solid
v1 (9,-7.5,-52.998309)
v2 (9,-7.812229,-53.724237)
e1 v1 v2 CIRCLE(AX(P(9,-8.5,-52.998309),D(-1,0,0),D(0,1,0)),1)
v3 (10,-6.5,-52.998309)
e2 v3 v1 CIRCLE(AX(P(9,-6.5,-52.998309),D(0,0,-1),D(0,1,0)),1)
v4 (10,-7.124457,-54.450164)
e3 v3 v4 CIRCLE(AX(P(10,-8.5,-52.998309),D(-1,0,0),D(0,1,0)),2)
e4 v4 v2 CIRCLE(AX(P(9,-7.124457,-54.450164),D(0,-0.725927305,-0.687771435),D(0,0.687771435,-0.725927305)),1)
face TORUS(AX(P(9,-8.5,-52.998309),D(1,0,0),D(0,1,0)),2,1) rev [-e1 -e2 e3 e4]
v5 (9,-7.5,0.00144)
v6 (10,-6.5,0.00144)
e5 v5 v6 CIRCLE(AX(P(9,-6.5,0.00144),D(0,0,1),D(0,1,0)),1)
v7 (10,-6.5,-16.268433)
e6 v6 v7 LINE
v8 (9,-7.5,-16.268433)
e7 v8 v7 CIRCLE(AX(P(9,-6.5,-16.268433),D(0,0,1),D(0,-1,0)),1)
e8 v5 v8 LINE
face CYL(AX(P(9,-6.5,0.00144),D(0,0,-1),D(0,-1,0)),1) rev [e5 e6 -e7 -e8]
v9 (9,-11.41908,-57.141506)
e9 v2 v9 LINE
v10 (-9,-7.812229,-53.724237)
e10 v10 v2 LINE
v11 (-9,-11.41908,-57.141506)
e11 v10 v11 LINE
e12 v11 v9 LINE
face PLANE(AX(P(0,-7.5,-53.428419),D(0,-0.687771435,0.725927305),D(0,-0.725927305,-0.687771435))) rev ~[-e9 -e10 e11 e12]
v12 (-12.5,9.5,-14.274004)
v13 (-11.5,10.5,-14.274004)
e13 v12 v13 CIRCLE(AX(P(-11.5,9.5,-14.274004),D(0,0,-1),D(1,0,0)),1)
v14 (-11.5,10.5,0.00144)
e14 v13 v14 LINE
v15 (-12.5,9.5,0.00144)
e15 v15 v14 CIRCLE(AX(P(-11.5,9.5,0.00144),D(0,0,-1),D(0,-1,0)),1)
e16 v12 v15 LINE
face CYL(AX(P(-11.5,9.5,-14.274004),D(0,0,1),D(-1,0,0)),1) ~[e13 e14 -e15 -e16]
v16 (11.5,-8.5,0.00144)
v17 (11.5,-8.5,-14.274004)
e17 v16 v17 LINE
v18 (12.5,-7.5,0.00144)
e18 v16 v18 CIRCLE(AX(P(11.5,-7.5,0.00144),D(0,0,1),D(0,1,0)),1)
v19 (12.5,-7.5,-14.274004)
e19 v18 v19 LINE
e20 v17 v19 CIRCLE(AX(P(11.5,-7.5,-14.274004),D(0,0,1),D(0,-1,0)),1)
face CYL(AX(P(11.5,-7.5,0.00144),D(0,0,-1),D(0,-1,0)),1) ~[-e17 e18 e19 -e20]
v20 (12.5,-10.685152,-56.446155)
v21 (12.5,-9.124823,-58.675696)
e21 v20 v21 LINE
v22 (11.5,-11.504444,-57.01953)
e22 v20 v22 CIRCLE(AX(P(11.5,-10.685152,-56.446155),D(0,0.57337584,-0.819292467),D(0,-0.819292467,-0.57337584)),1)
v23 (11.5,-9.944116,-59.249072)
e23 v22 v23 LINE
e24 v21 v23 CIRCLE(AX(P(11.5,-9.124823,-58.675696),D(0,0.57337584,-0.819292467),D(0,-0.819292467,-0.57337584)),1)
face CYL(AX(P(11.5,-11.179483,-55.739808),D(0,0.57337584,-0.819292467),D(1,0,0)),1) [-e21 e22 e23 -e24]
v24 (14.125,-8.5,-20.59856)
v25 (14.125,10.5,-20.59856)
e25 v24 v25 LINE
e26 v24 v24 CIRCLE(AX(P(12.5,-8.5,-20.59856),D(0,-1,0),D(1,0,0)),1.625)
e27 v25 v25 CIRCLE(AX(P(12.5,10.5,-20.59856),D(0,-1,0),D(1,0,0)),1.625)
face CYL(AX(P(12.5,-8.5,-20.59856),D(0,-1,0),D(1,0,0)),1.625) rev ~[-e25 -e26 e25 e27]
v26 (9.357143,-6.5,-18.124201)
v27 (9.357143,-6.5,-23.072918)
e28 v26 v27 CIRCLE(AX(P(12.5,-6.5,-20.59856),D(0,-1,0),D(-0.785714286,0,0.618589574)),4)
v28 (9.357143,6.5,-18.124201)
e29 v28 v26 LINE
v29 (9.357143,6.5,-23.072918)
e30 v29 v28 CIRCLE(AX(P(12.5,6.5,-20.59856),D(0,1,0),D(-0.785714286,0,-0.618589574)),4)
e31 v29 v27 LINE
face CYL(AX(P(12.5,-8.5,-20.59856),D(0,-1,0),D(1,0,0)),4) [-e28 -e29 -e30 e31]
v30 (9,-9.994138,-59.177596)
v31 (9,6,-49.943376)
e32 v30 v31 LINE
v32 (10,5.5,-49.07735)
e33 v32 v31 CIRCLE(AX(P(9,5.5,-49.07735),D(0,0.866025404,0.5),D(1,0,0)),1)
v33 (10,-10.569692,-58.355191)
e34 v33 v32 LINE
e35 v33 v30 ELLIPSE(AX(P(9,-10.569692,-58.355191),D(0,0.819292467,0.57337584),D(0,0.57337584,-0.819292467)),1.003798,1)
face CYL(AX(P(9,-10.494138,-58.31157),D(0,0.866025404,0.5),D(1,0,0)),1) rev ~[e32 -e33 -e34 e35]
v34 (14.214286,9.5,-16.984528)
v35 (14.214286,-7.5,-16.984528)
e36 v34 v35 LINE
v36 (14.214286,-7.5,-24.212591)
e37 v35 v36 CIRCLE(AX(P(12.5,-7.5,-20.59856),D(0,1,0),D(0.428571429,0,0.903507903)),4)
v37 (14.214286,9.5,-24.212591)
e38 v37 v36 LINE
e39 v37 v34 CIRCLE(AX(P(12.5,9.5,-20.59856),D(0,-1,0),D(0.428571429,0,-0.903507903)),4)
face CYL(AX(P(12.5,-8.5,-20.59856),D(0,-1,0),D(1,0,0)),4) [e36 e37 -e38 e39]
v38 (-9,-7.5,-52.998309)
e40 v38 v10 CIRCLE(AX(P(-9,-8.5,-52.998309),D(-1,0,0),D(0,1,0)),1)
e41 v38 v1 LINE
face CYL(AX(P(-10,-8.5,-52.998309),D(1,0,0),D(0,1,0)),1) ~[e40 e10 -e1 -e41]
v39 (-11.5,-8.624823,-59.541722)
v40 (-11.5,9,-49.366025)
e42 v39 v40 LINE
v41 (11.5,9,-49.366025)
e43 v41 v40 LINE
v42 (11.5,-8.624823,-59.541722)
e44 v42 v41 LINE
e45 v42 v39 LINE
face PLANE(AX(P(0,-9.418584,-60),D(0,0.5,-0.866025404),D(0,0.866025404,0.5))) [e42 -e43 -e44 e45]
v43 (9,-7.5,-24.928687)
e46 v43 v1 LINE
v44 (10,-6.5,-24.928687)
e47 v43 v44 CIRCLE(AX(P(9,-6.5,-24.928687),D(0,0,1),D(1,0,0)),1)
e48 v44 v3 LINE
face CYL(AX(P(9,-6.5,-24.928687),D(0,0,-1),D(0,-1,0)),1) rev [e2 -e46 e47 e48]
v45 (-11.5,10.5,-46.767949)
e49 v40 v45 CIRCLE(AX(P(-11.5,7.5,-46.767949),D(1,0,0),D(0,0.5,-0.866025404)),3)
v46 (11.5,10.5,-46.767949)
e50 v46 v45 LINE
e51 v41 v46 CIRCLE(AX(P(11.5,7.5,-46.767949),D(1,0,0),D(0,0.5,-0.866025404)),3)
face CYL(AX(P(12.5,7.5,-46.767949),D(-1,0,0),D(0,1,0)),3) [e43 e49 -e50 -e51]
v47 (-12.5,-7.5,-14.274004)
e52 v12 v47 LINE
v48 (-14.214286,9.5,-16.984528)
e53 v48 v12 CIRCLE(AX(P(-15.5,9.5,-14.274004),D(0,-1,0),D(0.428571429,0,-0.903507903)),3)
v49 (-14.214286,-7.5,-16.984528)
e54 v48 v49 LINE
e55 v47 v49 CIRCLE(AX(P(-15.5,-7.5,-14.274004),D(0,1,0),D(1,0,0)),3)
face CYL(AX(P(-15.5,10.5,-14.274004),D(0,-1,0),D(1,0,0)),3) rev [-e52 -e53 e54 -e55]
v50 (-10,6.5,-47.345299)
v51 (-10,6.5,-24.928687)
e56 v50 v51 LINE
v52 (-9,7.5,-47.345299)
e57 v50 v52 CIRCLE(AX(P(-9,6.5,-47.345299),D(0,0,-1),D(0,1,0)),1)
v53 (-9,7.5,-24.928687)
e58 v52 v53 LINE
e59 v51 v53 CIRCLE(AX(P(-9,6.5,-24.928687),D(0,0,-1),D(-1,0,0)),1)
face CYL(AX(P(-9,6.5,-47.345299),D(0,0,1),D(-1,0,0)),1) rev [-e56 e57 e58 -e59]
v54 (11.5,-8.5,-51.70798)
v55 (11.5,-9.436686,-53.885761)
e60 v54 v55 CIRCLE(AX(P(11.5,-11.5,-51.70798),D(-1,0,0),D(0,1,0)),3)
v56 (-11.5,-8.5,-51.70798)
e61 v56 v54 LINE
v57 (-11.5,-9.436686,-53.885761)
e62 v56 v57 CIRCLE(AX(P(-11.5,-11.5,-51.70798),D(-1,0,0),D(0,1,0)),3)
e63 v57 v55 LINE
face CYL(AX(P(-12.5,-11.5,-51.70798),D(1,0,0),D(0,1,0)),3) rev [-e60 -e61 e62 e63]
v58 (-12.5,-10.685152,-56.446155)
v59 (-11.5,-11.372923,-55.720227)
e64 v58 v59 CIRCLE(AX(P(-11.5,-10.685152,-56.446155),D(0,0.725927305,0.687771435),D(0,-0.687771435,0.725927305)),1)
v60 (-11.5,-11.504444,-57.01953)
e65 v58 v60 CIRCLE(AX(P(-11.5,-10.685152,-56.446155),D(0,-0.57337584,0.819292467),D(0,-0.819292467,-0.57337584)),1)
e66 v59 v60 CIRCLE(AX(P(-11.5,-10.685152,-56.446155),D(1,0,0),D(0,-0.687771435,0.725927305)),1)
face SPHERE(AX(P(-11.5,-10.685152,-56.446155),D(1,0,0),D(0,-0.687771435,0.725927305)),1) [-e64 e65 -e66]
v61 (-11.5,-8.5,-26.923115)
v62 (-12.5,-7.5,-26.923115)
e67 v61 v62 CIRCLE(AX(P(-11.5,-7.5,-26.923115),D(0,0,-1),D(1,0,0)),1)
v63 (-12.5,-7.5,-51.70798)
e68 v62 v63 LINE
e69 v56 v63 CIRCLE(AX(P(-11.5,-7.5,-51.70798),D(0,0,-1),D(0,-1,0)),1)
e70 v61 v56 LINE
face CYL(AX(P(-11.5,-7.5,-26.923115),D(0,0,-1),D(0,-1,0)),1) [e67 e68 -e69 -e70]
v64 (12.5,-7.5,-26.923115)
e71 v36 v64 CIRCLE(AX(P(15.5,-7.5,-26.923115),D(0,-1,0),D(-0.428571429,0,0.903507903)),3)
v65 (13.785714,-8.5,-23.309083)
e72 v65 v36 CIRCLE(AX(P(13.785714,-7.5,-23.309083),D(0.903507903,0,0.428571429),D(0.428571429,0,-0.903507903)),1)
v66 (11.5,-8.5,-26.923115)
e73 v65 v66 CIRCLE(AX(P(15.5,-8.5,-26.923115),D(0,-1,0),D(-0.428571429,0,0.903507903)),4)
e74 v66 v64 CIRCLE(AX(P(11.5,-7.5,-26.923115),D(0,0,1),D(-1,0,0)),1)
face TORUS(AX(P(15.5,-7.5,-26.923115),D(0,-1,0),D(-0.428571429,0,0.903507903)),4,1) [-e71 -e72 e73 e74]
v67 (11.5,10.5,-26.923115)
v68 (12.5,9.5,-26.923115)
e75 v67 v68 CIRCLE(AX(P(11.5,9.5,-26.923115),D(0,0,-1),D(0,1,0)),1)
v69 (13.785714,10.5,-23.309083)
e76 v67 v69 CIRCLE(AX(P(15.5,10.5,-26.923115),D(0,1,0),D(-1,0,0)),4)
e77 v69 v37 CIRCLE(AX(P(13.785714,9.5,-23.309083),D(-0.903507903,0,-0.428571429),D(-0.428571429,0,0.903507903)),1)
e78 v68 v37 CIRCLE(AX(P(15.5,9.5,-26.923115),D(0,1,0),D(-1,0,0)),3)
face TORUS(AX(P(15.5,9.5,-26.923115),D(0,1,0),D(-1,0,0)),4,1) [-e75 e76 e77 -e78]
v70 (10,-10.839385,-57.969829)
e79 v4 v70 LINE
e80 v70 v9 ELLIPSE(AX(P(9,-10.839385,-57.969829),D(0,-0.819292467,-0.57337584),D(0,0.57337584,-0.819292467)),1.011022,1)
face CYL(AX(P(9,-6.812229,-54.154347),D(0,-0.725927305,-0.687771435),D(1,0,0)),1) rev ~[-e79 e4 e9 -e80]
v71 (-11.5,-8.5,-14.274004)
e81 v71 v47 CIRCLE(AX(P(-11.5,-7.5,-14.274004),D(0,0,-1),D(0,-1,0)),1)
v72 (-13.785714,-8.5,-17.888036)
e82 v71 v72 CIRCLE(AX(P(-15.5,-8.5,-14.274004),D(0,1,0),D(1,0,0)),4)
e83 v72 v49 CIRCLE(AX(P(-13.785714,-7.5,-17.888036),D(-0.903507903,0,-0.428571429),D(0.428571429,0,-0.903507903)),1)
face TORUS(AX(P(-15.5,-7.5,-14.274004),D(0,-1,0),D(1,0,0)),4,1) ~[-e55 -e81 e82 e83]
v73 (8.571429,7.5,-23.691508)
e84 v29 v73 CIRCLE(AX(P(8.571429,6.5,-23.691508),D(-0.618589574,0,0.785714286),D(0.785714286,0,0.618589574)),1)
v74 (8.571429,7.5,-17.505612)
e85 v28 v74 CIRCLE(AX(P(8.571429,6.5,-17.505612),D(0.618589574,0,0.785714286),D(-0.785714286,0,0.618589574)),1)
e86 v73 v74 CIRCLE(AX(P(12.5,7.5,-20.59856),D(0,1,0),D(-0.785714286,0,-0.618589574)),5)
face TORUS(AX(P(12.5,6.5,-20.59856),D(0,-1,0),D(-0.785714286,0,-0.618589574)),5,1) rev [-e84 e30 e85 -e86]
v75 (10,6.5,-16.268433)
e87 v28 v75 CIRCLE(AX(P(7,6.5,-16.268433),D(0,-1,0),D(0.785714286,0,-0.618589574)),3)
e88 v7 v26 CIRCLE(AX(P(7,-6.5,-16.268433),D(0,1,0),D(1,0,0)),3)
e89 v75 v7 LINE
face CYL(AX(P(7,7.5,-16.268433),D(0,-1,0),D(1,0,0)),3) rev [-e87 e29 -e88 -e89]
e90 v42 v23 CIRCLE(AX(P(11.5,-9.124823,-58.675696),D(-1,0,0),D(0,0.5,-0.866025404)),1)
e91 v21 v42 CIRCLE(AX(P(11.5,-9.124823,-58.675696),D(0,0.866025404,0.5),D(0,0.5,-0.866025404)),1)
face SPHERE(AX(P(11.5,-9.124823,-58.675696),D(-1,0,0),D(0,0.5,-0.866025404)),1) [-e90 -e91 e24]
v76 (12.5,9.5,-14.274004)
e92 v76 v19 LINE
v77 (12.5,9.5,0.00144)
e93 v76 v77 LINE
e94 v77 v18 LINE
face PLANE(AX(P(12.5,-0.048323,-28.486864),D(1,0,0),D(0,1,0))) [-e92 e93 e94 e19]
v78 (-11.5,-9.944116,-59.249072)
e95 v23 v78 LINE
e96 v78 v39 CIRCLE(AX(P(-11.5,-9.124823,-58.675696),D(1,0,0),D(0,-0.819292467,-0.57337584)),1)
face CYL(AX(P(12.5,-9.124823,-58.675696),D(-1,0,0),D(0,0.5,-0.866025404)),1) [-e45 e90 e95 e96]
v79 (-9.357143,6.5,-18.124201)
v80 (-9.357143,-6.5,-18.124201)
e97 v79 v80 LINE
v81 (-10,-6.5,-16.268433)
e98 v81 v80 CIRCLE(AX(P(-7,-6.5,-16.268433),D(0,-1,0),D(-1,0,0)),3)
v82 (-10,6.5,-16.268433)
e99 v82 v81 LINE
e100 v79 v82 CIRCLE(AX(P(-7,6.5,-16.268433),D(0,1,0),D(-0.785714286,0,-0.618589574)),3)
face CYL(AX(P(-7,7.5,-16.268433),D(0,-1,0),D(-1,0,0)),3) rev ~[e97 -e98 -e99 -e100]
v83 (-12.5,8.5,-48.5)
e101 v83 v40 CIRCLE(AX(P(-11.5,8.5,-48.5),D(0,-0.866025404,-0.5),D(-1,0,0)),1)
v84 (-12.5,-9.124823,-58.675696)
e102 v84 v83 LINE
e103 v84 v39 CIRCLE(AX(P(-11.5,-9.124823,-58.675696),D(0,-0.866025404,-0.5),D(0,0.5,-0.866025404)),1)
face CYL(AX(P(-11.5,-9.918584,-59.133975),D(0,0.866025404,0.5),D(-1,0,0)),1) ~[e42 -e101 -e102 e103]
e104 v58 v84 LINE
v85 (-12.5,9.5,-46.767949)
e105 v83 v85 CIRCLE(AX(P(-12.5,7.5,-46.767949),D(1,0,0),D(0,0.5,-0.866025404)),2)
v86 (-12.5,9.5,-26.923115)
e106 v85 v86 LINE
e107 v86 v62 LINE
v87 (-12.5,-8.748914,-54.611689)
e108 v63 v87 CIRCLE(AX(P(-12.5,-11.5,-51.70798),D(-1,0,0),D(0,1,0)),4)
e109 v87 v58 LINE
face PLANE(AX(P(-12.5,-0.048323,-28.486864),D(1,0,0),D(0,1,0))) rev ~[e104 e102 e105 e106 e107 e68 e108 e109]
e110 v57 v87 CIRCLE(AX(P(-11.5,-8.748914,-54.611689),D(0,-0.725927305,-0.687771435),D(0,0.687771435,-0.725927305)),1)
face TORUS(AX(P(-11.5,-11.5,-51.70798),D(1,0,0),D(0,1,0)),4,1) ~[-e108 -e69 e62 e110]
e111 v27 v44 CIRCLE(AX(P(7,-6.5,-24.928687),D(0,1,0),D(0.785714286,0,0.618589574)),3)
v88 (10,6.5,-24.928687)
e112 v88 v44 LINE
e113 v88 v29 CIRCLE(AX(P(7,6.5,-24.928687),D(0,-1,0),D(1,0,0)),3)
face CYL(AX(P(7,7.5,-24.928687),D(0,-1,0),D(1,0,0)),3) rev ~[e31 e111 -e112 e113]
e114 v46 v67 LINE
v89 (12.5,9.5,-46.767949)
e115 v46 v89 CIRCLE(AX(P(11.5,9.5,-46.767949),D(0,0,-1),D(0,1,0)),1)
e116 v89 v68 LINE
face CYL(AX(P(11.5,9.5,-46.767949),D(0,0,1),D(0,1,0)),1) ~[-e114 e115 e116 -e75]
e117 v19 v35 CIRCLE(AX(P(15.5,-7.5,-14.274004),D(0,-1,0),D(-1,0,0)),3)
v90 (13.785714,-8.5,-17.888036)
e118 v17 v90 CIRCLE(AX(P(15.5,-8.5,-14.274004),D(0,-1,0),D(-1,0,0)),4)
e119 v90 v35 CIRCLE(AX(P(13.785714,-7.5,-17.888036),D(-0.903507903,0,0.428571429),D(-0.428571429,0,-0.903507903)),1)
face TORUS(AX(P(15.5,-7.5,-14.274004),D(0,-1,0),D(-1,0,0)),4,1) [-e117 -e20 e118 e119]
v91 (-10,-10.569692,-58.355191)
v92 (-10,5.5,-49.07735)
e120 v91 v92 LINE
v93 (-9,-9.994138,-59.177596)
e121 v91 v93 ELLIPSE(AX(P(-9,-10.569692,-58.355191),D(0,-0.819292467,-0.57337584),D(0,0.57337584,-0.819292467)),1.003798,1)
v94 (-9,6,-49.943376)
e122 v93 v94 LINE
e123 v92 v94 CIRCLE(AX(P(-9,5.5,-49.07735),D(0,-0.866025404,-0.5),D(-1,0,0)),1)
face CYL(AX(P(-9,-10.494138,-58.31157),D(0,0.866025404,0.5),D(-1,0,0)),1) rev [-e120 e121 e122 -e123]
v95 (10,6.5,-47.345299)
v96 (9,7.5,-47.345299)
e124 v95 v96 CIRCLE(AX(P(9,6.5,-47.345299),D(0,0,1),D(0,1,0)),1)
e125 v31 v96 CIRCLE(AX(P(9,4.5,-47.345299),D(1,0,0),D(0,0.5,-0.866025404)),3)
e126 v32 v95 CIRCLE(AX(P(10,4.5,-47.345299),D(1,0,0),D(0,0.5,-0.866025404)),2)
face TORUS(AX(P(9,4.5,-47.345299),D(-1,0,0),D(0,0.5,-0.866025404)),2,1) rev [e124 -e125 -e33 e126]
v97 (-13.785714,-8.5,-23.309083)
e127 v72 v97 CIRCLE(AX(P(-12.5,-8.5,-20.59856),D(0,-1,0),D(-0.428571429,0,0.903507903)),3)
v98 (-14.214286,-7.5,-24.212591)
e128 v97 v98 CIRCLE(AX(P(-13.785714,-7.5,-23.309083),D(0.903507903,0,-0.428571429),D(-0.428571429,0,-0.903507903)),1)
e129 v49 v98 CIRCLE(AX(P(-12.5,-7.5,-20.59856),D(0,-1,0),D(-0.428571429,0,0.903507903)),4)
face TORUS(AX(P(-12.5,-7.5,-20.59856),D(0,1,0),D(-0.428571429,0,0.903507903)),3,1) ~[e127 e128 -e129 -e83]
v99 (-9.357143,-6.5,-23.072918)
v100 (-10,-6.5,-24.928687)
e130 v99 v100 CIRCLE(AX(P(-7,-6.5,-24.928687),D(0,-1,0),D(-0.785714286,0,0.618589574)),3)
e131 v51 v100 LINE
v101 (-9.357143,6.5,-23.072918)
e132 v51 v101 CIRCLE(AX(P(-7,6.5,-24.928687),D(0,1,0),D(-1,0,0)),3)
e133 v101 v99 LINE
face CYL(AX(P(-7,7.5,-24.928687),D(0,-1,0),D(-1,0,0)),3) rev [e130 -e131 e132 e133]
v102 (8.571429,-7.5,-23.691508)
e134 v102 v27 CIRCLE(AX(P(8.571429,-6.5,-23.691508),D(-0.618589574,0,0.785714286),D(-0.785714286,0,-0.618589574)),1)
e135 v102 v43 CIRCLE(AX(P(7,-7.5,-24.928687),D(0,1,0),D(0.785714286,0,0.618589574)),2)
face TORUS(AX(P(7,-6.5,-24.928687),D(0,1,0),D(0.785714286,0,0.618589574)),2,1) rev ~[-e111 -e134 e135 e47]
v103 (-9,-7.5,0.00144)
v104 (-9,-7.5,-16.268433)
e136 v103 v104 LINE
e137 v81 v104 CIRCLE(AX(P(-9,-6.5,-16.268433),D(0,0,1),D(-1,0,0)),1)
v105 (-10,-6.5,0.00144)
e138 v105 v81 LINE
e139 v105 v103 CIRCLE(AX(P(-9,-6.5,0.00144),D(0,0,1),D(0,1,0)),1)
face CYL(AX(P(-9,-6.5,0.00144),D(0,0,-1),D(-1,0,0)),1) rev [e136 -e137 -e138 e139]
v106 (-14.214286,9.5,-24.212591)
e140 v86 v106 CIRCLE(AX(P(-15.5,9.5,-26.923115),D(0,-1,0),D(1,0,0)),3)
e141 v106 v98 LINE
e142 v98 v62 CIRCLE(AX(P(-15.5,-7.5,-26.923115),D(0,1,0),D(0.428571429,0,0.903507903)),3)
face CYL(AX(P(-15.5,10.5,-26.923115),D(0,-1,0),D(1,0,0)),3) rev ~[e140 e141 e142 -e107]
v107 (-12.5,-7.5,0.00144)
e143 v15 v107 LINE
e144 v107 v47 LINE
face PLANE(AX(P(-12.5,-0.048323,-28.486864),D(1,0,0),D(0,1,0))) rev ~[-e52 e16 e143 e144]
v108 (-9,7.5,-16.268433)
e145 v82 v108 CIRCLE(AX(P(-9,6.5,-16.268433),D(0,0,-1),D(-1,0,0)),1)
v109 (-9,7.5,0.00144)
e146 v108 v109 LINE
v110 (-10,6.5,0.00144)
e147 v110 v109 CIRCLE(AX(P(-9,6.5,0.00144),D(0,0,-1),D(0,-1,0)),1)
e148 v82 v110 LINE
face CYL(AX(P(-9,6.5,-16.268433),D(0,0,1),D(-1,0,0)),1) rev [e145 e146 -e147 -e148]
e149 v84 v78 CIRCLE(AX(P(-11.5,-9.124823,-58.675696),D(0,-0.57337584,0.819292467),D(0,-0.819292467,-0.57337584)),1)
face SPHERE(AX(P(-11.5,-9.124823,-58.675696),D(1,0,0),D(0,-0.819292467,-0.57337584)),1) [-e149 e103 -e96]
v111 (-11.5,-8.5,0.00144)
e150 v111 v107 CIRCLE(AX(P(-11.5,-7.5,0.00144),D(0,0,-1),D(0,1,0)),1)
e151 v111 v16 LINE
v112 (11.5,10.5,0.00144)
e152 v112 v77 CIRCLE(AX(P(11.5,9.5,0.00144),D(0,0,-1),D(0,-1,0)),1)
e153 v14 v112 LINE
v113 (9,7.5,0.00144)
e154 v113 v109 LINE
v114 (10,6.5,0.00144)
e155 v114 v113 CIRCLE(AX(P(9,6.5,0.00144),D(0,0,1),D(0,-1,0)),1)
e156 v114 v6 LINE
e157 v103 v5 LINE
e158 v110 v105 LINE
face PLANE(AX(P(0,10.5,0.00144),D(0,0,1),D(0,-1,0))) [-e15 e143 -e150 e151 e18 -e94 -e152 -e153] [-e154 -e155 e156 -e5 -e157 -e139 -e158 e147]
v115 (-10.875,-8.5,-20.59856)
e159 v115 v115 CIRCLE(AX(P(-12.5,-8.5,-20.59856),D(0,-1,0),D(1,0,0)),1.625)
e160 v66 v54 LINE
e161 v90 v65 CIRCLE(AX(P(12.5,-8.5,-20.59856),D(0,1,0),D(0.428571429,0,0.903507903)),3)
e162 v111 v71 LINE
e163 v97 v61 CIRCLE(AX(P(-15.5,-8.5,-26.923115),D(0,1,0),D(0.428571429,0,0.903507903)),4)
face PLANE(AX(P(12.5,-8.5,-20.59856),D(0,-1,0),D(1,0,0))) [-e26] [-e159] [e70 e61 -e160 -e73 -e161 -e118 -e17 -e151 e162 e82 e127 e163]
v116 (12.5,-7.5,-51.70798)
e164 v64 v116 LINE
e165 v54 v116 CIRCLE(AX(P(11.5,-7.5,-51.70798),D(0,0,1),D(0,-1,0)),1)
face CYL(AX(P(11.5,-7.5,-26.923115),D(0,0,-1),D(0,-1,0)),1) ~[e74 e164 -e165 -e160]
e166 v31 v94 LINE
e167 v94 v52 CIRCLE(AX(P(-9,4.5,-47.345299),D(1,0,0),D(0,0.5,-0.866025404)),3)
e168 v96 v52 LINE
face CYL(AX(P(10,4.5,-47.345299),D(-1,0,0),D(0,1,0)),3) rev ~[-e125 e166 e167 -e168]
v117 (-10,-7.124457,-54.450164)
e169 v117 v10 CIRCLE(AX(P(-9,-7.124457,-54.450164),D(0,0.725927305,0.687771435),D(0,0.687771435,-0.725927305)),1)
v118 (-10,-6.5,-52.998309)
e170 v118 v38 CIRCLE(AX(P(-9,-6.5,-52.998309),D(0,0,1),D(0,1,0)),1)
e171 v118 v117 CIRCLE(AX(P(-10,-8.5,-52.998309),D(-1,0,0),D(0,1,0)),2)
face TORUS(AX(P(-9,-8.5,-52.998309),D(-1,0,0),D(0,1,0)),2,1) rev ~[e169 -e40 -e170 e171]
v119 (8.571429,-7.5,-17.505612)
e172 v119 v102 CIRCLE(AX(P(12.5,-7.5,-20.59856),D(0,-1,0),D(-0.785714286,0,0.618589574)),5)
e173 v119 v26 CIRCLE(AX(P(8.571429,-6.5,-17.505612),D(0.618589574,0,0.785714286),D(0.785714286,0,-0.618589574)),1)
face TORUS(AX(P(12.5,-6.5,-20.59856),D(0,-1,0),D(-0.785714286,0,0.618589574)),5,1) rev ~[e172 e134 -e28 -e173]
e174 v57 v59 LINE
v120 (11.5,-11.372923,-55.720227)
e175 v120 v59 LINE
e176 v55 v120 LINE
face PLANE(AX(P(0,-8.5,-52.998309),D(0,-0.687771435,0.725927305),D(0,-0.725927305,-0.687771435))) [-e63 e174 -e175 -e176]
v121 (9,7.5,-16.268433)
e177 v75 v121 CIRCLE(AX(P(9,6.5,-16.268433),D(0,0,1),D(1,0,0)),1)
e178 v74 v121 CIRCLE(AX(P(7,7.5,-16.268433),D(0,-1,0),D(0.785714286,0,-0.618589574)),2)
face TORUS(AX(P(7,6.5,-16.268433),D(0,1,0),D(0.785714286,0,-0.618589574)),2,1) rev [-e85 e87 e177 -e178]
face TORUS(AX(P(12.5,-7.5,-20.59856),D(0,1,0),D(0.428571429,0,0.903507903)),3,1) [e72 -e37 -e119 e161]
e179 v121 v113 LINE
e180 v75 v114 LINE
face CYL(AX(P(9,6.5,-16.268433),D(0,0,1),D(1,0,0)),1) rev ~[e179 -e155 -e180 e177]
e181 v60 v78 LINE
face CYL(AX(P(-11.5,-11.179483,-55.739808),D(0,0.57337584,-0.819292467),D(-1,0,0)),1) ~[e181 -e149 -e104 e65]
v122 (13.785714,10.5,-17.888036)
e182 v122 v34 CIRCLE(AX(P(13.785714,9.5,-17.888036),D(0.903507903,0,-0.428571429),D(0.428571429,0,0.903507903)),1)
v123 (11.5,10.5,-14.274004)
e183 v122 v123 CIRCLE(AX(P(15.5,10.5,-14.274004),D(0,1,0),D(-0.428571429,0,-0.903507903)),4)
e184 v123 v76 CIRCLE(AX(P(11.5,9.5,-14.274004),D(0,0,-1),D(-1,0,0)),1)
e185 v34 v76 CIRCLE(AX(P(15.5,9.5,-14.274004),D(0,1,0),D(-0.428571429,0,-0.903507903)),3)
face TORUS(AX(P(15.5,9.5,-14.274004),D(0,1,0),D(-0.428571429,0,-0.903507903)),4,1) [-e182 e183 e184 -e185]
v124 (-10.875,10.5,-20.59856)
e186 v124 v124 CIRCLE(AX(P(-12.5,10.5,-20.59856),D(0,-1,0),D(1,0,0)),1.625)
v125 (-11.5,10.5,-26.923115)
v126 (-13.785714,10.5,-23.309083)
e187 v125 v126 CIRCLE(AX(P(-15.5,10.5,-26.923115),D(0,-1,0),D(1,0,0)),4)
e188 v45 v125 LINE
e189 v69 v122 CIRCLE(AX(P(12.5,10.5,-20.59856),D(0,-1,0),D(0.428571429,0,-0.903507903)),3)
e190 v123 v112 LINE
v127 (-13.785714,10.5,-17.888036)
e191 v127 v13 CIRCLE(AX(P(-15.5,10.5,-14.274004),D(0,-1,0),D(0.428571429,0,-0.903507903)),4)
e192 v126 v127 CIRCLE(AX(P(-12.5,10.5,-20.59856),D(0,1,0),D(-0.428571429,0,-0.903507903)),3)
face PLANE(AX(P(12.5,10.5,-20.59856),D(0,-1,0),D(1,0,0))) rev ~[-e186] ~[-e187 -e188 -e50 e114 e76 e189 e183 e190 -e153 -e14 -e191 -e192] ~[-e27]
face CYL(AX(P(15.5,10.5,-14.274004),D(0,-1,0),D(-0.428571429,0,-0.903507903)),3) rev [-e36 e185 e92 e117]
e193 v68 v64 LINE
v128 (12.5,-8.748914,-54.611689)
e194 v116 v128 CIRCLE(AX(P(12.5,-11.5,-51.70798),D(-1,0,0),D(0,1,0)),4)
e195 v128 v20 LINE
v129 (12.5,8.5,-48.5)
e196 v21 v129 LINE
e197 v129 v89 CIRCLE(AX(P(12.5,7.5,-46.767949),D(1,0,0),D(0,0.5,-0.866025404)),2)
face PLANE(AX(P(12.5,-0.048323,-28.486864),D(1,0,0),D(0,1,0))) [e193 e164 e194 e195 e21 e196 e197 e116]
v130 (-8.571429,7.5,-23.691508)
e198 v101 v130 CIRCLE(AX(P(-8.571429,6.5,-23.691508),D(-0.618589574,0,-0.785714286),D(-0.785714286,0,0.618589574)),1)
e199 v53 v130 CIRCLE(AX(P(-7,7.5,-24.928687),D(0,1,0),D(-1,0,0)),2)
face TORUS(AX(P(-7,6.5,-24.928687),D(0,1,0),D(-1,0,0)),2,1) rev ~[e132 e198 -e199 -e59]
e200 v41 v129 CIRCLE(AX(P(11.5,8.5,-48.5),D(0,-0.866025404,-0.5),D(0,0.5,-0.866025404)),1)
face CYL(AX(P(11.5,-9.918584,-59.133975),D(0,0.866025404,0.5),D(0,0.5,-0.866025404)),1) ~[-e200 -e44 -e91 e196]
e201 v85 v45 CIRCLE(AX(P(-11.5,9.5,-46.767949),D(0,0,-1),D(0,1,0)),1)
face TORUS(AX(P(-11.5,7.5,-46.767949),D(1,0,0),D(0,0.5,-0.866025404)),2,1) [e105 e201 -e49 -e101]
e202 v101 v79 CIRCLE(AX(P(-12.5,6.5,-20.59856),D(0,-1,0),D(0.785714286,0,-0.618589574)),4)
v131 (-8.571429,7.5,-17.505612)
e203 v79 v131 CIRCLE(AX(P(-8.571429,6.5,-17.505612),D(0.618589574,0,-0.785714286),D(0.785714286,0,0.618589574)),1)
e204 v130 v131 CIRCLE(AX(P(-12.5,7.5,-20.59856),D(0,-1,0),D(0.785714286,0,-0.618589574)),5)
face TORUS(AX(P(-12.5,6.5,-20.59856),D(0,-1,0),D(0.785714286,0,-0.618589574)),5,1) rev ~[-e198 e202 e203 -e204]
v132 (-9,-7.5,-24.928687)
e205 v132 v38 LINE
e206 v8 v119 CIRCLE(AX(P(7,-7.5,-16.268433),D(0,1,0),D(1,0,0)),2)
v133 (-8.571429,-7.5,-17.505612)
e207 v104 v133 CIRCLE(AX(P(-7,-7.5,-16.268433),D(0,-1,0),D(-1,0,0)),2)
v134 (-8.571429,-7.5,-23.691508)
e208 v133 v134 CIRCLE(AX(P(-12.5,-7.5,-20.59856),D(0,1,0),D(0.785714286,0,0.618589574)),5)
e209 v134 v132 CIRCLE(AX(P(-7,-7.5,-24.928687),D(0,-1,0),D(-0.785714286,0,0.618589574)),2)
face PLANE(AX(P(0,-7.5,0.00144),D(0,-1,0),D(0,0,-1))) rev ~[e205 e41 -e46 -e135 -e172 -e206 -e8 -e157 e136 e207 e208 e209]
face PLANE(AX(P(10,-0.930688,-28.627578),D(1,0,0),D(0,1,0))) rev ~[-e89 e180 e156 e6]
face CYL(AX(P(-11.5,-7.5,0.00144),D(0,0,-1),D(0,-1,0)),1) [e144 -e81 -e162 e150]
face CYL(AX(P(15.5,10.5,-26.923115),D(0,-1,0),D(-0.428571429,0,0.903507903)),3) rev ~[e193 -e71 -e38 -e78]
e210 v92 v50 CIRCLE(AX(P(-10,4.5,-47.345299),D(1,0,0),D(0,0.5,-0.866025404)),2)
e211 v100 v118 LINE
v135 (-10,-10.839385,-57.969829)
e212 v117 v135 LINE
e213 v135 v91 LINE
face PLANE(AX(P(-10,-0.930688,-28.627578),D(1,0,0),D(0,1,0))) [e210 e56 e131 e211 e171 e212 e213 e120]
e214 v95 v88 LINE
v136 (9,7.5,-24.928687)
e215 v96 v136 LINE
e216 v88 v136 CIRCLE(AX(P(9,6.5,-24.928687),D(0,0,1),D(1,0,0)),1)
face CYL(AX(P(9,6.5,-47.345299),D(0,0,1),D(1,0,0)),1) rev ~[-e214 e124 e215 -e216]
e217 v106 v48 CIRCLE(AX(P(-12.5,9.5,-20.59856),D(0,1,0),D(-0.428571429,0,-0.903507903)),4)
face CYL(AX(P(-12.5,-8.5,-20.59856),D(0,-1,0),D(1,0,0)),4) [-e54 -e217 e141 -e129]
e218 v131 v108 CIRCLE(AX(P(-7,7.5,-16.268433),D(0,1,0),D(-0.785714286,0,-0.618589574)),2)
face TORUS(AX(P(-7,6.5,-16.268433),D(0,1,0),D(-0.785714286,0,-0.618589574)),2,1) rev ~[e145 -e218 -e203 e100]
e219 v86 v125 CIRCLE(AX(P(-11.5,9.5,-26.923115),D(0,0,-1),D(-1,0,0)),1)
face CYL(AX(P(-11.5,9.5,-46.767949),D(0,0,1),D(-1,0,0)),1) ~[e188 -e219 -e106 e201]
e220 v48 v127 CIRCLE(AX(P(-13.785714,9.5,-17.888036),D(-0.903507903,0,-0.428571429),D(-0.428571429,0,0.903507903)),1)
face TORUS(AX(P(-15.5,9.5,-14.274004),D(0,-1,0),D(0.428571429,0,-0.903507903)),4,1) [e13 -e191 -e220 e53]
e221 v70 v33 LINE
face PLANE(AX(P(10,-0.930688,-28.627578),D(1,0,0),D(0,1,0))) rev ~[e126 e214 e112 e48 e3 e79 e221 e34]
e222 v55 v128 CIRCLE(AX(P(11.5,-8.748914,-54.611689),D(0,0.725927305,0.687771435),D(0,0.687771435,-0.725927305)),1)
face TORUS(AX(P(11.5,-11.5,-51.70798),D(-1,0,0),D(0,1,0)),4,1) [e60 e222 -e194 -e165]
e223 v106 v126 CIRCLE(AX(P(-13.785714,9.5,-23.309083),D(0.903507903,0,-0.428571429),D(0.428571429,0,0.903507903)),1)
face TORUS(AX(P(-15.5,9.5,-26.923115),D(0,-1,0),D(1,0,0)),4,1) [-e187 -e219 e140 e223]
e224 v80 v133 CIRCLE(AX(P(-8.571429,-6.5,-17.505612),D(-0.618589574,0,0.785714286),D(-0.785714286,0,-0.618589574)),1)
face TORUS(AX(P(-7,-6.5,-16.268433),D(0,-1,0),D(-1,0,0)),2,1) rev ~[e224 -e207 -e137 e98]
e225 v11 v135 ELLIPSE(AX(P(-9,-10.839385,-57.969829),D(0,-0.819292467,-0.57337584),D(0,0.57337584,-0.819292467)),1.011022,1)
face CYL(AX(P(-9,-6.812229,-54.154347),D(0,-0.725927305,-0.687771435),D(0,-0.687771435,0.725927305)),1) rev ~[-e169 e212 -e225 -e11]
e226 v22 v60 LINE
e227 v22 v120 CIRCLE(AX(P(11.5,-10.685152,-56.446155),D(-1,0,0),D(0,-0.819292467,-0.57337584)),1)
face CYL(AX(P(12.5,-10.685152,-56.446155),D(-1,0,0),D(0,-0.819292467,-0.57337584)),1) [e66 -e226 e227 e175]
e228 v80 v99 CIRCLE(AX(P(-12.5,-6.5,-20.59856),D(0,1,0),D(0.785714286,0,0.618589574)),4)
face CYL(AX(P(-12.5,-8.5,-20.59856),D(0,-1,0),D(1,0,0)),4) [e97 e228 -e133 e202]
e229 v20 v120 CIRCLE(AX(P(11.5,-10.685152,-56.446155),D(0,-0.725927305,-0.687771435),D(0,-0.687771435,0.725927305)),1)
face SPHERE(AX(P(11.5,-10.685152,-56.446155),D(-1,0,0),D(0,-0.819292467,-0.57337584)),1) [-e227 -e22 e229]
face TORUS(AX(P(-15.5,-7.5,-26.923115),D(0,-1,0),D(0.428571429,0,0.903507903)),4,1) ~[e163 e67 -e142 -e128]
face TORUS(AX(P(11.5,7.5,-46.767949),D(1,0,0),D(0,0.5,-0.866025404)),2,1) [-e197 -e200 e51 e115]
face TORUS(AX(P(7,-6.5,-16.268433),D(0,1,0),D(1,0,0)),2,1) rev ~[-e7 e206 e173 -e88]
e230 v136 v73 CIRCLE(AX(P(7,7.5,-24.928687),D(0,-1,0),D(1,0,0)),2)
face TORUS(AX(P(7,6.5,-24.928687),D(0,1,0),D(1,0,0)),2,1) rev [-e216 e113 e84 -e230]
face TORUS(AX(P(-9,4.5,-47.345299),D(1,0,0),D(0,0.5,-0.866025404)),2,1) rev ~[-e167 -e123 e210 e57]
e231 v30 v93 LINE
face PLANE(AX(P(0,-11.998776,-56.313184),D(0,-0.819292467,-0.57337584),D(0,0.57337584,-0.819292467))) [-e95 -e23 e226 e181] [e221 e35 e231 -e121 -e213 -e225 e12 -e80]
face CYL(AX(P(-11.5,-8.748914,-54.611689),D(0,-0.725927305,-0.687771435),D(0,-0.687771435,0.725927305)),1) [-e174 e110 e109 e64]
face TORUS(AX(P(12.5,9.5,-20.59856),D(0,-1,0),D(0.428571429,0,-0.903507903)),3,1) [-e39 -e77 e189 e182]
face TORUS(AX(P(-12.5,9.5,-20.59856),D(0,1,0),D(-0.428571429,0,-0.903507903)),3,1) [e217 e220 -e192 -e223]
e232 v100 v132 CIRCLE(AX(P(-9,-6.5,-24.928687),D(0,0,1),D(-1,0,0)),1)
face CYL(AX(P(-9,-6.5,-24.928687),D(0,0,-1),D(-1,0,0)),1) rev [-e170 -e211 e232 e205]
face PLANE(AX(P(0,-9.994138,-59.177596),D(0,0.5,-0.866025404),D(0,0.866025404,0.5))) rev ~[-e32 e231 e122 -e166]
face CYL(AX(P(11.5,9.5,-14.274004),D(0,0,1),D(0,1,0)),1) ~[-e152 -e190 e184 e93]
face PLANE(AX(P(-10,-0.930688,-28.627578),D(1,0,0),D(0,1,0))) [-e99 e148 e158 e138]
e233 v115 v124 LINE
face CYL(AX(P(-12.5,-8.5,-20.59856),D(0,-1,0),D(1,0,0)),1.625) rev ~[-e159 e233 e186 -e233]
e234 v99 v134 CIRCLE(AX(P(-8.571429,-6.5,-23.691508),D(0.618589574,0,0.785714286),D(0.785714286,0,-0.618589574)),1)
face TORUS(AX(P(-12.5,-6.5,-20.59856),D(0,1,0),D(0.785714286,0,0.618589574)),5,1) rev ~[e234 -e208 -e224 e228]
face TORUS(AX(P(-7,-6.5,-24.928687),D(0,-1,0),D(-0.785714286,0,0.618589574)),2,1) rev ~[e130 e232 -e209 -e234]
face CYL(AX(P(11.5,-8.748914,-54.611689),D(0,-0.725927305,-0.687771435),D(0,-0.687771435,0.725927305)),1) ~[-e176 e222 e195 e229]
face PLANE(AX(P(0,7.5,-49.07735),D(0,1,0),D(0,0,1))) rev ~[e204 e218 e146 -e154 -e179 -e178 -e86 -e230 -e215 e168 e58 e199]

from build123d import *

# Parameters (mm, degrees)
F1_DEPTH = 12.5
F3_DEPTH = 10
F4_R     = 4
F5_DEPTH = 19
F6_R     = 1.625
F7_DEPTH = 19
F8_R     = 3
F9_R     = 1


with BuildPart() as f1:
    # F0 (on Right) → F1 (new body, symmetric)
    with BuildSketch(Plane.YZ):
        Polygon((10.5, -48.5), (10.5, 0.0014402197), (-8.5, 0.0014402197), (-8.5, -52.9983094265), (-11.9987755675, -56.3131838999), (-9.418584287, -60), align=None)
    extrude(amount=F1_DEPTH, both=True)

    # F2 (on Right) → F3 (cut, symmetric)
    with BuildSketch(Plane.YZ):
        Polygon((7.5, 0.0014402197), (-7.5, 0.0014402197), (-7.5, -53.428419387), (-11.4190800593, -57.1415064933), (-9.9941380171, -59.1775955626), (7.5, -49.0773502692), align=None)
    extrude(amount=F3_DEPTH, both=True, mode=Mode.SUBTRACT)

    # F4 (on face) → F5 (join, through all)
    with BuildSketch(Plane.XZ.offset(8.5)):
        with Locations((12.5, -20.5985597803)):
            Circle(F4_R)
        with Locations((-12.5, -20.5985597803)):
            Circle(F4_R)
    extrude(amount=-F5_DEPTH)

    # F6 (on face) → F7 (cut, through all)
    with BuildSketch(Plane.XZ.offset(8.5)):
        with Locations((-12.5, -20.5985597803)):
            Circle(F6_R)
        with Locations((12.5, -20.5985597803)):
            Circle(F6_R)
    extrude(amount=-F7_DEPTH, mode=Mode.SUBTRACT)

    # F8
    f8_edges = [f1.edges().sort_by_distance(p)[0] for p in [
        (-12.5, 1, -16.59856),
        (-12.5, 1, -24.59856),
        (12.5, 1, -16.59856),
        (12.5, 1, -24.59856),
        (-10, 0, -17.476061),
        (-10, 0, -23.721059),
        (10, 0, -17.476061),
        (10, 0, -23.721059),
        (0, 7.5, -49.07735),
        (0, -8.5, -52.998309),
        (0, 10.5, -48.5),
    ]]
    fillet(f8_edges, radius=F8_R)

    # F9
    f9_edges = [f1.edges().sort_by_distance(p)[0] for p in [
        (10, -7.5, -8.133496),
        (-10, -7.5, -8.133496),
        (10, 7.5, -8.133496),
        (-10, 7.5, -8.133496),
        (-10, -1.997069, -54.560486),
        (10, -1.997069, -54.560486),
        (10, -9.45954, -55.284963),
        (-10, -9.45954, -55.284963),
        (0, -7.5, -53.428419),
        (-12.5, -8.5, -39.315547),
        (-16.5, -8.5, -20.59856),
        (-12.5, -8.5, -7.136282),
        (-12.5, -10.70868, -58.156592),
        (-12.5, -0.209292, -54.683013),
        (-12.5, 10.5, -36.845532),
        (12.5, 10.5, -36.845532),
        (0, 9, -49.366025),
        (12.5, -8.5, -39.315547),
        (16.5, -8.5, -20.59856),
        (12.5, -0.209292, -54.683013),
        (0, -11.998776, -56.313184),
        (12.5, -10.70868, -58.156592),
        (0, -9.418584, -60),
    ]]
    fillet(f9_edges, radius=F9_R)


solid = f1.part
